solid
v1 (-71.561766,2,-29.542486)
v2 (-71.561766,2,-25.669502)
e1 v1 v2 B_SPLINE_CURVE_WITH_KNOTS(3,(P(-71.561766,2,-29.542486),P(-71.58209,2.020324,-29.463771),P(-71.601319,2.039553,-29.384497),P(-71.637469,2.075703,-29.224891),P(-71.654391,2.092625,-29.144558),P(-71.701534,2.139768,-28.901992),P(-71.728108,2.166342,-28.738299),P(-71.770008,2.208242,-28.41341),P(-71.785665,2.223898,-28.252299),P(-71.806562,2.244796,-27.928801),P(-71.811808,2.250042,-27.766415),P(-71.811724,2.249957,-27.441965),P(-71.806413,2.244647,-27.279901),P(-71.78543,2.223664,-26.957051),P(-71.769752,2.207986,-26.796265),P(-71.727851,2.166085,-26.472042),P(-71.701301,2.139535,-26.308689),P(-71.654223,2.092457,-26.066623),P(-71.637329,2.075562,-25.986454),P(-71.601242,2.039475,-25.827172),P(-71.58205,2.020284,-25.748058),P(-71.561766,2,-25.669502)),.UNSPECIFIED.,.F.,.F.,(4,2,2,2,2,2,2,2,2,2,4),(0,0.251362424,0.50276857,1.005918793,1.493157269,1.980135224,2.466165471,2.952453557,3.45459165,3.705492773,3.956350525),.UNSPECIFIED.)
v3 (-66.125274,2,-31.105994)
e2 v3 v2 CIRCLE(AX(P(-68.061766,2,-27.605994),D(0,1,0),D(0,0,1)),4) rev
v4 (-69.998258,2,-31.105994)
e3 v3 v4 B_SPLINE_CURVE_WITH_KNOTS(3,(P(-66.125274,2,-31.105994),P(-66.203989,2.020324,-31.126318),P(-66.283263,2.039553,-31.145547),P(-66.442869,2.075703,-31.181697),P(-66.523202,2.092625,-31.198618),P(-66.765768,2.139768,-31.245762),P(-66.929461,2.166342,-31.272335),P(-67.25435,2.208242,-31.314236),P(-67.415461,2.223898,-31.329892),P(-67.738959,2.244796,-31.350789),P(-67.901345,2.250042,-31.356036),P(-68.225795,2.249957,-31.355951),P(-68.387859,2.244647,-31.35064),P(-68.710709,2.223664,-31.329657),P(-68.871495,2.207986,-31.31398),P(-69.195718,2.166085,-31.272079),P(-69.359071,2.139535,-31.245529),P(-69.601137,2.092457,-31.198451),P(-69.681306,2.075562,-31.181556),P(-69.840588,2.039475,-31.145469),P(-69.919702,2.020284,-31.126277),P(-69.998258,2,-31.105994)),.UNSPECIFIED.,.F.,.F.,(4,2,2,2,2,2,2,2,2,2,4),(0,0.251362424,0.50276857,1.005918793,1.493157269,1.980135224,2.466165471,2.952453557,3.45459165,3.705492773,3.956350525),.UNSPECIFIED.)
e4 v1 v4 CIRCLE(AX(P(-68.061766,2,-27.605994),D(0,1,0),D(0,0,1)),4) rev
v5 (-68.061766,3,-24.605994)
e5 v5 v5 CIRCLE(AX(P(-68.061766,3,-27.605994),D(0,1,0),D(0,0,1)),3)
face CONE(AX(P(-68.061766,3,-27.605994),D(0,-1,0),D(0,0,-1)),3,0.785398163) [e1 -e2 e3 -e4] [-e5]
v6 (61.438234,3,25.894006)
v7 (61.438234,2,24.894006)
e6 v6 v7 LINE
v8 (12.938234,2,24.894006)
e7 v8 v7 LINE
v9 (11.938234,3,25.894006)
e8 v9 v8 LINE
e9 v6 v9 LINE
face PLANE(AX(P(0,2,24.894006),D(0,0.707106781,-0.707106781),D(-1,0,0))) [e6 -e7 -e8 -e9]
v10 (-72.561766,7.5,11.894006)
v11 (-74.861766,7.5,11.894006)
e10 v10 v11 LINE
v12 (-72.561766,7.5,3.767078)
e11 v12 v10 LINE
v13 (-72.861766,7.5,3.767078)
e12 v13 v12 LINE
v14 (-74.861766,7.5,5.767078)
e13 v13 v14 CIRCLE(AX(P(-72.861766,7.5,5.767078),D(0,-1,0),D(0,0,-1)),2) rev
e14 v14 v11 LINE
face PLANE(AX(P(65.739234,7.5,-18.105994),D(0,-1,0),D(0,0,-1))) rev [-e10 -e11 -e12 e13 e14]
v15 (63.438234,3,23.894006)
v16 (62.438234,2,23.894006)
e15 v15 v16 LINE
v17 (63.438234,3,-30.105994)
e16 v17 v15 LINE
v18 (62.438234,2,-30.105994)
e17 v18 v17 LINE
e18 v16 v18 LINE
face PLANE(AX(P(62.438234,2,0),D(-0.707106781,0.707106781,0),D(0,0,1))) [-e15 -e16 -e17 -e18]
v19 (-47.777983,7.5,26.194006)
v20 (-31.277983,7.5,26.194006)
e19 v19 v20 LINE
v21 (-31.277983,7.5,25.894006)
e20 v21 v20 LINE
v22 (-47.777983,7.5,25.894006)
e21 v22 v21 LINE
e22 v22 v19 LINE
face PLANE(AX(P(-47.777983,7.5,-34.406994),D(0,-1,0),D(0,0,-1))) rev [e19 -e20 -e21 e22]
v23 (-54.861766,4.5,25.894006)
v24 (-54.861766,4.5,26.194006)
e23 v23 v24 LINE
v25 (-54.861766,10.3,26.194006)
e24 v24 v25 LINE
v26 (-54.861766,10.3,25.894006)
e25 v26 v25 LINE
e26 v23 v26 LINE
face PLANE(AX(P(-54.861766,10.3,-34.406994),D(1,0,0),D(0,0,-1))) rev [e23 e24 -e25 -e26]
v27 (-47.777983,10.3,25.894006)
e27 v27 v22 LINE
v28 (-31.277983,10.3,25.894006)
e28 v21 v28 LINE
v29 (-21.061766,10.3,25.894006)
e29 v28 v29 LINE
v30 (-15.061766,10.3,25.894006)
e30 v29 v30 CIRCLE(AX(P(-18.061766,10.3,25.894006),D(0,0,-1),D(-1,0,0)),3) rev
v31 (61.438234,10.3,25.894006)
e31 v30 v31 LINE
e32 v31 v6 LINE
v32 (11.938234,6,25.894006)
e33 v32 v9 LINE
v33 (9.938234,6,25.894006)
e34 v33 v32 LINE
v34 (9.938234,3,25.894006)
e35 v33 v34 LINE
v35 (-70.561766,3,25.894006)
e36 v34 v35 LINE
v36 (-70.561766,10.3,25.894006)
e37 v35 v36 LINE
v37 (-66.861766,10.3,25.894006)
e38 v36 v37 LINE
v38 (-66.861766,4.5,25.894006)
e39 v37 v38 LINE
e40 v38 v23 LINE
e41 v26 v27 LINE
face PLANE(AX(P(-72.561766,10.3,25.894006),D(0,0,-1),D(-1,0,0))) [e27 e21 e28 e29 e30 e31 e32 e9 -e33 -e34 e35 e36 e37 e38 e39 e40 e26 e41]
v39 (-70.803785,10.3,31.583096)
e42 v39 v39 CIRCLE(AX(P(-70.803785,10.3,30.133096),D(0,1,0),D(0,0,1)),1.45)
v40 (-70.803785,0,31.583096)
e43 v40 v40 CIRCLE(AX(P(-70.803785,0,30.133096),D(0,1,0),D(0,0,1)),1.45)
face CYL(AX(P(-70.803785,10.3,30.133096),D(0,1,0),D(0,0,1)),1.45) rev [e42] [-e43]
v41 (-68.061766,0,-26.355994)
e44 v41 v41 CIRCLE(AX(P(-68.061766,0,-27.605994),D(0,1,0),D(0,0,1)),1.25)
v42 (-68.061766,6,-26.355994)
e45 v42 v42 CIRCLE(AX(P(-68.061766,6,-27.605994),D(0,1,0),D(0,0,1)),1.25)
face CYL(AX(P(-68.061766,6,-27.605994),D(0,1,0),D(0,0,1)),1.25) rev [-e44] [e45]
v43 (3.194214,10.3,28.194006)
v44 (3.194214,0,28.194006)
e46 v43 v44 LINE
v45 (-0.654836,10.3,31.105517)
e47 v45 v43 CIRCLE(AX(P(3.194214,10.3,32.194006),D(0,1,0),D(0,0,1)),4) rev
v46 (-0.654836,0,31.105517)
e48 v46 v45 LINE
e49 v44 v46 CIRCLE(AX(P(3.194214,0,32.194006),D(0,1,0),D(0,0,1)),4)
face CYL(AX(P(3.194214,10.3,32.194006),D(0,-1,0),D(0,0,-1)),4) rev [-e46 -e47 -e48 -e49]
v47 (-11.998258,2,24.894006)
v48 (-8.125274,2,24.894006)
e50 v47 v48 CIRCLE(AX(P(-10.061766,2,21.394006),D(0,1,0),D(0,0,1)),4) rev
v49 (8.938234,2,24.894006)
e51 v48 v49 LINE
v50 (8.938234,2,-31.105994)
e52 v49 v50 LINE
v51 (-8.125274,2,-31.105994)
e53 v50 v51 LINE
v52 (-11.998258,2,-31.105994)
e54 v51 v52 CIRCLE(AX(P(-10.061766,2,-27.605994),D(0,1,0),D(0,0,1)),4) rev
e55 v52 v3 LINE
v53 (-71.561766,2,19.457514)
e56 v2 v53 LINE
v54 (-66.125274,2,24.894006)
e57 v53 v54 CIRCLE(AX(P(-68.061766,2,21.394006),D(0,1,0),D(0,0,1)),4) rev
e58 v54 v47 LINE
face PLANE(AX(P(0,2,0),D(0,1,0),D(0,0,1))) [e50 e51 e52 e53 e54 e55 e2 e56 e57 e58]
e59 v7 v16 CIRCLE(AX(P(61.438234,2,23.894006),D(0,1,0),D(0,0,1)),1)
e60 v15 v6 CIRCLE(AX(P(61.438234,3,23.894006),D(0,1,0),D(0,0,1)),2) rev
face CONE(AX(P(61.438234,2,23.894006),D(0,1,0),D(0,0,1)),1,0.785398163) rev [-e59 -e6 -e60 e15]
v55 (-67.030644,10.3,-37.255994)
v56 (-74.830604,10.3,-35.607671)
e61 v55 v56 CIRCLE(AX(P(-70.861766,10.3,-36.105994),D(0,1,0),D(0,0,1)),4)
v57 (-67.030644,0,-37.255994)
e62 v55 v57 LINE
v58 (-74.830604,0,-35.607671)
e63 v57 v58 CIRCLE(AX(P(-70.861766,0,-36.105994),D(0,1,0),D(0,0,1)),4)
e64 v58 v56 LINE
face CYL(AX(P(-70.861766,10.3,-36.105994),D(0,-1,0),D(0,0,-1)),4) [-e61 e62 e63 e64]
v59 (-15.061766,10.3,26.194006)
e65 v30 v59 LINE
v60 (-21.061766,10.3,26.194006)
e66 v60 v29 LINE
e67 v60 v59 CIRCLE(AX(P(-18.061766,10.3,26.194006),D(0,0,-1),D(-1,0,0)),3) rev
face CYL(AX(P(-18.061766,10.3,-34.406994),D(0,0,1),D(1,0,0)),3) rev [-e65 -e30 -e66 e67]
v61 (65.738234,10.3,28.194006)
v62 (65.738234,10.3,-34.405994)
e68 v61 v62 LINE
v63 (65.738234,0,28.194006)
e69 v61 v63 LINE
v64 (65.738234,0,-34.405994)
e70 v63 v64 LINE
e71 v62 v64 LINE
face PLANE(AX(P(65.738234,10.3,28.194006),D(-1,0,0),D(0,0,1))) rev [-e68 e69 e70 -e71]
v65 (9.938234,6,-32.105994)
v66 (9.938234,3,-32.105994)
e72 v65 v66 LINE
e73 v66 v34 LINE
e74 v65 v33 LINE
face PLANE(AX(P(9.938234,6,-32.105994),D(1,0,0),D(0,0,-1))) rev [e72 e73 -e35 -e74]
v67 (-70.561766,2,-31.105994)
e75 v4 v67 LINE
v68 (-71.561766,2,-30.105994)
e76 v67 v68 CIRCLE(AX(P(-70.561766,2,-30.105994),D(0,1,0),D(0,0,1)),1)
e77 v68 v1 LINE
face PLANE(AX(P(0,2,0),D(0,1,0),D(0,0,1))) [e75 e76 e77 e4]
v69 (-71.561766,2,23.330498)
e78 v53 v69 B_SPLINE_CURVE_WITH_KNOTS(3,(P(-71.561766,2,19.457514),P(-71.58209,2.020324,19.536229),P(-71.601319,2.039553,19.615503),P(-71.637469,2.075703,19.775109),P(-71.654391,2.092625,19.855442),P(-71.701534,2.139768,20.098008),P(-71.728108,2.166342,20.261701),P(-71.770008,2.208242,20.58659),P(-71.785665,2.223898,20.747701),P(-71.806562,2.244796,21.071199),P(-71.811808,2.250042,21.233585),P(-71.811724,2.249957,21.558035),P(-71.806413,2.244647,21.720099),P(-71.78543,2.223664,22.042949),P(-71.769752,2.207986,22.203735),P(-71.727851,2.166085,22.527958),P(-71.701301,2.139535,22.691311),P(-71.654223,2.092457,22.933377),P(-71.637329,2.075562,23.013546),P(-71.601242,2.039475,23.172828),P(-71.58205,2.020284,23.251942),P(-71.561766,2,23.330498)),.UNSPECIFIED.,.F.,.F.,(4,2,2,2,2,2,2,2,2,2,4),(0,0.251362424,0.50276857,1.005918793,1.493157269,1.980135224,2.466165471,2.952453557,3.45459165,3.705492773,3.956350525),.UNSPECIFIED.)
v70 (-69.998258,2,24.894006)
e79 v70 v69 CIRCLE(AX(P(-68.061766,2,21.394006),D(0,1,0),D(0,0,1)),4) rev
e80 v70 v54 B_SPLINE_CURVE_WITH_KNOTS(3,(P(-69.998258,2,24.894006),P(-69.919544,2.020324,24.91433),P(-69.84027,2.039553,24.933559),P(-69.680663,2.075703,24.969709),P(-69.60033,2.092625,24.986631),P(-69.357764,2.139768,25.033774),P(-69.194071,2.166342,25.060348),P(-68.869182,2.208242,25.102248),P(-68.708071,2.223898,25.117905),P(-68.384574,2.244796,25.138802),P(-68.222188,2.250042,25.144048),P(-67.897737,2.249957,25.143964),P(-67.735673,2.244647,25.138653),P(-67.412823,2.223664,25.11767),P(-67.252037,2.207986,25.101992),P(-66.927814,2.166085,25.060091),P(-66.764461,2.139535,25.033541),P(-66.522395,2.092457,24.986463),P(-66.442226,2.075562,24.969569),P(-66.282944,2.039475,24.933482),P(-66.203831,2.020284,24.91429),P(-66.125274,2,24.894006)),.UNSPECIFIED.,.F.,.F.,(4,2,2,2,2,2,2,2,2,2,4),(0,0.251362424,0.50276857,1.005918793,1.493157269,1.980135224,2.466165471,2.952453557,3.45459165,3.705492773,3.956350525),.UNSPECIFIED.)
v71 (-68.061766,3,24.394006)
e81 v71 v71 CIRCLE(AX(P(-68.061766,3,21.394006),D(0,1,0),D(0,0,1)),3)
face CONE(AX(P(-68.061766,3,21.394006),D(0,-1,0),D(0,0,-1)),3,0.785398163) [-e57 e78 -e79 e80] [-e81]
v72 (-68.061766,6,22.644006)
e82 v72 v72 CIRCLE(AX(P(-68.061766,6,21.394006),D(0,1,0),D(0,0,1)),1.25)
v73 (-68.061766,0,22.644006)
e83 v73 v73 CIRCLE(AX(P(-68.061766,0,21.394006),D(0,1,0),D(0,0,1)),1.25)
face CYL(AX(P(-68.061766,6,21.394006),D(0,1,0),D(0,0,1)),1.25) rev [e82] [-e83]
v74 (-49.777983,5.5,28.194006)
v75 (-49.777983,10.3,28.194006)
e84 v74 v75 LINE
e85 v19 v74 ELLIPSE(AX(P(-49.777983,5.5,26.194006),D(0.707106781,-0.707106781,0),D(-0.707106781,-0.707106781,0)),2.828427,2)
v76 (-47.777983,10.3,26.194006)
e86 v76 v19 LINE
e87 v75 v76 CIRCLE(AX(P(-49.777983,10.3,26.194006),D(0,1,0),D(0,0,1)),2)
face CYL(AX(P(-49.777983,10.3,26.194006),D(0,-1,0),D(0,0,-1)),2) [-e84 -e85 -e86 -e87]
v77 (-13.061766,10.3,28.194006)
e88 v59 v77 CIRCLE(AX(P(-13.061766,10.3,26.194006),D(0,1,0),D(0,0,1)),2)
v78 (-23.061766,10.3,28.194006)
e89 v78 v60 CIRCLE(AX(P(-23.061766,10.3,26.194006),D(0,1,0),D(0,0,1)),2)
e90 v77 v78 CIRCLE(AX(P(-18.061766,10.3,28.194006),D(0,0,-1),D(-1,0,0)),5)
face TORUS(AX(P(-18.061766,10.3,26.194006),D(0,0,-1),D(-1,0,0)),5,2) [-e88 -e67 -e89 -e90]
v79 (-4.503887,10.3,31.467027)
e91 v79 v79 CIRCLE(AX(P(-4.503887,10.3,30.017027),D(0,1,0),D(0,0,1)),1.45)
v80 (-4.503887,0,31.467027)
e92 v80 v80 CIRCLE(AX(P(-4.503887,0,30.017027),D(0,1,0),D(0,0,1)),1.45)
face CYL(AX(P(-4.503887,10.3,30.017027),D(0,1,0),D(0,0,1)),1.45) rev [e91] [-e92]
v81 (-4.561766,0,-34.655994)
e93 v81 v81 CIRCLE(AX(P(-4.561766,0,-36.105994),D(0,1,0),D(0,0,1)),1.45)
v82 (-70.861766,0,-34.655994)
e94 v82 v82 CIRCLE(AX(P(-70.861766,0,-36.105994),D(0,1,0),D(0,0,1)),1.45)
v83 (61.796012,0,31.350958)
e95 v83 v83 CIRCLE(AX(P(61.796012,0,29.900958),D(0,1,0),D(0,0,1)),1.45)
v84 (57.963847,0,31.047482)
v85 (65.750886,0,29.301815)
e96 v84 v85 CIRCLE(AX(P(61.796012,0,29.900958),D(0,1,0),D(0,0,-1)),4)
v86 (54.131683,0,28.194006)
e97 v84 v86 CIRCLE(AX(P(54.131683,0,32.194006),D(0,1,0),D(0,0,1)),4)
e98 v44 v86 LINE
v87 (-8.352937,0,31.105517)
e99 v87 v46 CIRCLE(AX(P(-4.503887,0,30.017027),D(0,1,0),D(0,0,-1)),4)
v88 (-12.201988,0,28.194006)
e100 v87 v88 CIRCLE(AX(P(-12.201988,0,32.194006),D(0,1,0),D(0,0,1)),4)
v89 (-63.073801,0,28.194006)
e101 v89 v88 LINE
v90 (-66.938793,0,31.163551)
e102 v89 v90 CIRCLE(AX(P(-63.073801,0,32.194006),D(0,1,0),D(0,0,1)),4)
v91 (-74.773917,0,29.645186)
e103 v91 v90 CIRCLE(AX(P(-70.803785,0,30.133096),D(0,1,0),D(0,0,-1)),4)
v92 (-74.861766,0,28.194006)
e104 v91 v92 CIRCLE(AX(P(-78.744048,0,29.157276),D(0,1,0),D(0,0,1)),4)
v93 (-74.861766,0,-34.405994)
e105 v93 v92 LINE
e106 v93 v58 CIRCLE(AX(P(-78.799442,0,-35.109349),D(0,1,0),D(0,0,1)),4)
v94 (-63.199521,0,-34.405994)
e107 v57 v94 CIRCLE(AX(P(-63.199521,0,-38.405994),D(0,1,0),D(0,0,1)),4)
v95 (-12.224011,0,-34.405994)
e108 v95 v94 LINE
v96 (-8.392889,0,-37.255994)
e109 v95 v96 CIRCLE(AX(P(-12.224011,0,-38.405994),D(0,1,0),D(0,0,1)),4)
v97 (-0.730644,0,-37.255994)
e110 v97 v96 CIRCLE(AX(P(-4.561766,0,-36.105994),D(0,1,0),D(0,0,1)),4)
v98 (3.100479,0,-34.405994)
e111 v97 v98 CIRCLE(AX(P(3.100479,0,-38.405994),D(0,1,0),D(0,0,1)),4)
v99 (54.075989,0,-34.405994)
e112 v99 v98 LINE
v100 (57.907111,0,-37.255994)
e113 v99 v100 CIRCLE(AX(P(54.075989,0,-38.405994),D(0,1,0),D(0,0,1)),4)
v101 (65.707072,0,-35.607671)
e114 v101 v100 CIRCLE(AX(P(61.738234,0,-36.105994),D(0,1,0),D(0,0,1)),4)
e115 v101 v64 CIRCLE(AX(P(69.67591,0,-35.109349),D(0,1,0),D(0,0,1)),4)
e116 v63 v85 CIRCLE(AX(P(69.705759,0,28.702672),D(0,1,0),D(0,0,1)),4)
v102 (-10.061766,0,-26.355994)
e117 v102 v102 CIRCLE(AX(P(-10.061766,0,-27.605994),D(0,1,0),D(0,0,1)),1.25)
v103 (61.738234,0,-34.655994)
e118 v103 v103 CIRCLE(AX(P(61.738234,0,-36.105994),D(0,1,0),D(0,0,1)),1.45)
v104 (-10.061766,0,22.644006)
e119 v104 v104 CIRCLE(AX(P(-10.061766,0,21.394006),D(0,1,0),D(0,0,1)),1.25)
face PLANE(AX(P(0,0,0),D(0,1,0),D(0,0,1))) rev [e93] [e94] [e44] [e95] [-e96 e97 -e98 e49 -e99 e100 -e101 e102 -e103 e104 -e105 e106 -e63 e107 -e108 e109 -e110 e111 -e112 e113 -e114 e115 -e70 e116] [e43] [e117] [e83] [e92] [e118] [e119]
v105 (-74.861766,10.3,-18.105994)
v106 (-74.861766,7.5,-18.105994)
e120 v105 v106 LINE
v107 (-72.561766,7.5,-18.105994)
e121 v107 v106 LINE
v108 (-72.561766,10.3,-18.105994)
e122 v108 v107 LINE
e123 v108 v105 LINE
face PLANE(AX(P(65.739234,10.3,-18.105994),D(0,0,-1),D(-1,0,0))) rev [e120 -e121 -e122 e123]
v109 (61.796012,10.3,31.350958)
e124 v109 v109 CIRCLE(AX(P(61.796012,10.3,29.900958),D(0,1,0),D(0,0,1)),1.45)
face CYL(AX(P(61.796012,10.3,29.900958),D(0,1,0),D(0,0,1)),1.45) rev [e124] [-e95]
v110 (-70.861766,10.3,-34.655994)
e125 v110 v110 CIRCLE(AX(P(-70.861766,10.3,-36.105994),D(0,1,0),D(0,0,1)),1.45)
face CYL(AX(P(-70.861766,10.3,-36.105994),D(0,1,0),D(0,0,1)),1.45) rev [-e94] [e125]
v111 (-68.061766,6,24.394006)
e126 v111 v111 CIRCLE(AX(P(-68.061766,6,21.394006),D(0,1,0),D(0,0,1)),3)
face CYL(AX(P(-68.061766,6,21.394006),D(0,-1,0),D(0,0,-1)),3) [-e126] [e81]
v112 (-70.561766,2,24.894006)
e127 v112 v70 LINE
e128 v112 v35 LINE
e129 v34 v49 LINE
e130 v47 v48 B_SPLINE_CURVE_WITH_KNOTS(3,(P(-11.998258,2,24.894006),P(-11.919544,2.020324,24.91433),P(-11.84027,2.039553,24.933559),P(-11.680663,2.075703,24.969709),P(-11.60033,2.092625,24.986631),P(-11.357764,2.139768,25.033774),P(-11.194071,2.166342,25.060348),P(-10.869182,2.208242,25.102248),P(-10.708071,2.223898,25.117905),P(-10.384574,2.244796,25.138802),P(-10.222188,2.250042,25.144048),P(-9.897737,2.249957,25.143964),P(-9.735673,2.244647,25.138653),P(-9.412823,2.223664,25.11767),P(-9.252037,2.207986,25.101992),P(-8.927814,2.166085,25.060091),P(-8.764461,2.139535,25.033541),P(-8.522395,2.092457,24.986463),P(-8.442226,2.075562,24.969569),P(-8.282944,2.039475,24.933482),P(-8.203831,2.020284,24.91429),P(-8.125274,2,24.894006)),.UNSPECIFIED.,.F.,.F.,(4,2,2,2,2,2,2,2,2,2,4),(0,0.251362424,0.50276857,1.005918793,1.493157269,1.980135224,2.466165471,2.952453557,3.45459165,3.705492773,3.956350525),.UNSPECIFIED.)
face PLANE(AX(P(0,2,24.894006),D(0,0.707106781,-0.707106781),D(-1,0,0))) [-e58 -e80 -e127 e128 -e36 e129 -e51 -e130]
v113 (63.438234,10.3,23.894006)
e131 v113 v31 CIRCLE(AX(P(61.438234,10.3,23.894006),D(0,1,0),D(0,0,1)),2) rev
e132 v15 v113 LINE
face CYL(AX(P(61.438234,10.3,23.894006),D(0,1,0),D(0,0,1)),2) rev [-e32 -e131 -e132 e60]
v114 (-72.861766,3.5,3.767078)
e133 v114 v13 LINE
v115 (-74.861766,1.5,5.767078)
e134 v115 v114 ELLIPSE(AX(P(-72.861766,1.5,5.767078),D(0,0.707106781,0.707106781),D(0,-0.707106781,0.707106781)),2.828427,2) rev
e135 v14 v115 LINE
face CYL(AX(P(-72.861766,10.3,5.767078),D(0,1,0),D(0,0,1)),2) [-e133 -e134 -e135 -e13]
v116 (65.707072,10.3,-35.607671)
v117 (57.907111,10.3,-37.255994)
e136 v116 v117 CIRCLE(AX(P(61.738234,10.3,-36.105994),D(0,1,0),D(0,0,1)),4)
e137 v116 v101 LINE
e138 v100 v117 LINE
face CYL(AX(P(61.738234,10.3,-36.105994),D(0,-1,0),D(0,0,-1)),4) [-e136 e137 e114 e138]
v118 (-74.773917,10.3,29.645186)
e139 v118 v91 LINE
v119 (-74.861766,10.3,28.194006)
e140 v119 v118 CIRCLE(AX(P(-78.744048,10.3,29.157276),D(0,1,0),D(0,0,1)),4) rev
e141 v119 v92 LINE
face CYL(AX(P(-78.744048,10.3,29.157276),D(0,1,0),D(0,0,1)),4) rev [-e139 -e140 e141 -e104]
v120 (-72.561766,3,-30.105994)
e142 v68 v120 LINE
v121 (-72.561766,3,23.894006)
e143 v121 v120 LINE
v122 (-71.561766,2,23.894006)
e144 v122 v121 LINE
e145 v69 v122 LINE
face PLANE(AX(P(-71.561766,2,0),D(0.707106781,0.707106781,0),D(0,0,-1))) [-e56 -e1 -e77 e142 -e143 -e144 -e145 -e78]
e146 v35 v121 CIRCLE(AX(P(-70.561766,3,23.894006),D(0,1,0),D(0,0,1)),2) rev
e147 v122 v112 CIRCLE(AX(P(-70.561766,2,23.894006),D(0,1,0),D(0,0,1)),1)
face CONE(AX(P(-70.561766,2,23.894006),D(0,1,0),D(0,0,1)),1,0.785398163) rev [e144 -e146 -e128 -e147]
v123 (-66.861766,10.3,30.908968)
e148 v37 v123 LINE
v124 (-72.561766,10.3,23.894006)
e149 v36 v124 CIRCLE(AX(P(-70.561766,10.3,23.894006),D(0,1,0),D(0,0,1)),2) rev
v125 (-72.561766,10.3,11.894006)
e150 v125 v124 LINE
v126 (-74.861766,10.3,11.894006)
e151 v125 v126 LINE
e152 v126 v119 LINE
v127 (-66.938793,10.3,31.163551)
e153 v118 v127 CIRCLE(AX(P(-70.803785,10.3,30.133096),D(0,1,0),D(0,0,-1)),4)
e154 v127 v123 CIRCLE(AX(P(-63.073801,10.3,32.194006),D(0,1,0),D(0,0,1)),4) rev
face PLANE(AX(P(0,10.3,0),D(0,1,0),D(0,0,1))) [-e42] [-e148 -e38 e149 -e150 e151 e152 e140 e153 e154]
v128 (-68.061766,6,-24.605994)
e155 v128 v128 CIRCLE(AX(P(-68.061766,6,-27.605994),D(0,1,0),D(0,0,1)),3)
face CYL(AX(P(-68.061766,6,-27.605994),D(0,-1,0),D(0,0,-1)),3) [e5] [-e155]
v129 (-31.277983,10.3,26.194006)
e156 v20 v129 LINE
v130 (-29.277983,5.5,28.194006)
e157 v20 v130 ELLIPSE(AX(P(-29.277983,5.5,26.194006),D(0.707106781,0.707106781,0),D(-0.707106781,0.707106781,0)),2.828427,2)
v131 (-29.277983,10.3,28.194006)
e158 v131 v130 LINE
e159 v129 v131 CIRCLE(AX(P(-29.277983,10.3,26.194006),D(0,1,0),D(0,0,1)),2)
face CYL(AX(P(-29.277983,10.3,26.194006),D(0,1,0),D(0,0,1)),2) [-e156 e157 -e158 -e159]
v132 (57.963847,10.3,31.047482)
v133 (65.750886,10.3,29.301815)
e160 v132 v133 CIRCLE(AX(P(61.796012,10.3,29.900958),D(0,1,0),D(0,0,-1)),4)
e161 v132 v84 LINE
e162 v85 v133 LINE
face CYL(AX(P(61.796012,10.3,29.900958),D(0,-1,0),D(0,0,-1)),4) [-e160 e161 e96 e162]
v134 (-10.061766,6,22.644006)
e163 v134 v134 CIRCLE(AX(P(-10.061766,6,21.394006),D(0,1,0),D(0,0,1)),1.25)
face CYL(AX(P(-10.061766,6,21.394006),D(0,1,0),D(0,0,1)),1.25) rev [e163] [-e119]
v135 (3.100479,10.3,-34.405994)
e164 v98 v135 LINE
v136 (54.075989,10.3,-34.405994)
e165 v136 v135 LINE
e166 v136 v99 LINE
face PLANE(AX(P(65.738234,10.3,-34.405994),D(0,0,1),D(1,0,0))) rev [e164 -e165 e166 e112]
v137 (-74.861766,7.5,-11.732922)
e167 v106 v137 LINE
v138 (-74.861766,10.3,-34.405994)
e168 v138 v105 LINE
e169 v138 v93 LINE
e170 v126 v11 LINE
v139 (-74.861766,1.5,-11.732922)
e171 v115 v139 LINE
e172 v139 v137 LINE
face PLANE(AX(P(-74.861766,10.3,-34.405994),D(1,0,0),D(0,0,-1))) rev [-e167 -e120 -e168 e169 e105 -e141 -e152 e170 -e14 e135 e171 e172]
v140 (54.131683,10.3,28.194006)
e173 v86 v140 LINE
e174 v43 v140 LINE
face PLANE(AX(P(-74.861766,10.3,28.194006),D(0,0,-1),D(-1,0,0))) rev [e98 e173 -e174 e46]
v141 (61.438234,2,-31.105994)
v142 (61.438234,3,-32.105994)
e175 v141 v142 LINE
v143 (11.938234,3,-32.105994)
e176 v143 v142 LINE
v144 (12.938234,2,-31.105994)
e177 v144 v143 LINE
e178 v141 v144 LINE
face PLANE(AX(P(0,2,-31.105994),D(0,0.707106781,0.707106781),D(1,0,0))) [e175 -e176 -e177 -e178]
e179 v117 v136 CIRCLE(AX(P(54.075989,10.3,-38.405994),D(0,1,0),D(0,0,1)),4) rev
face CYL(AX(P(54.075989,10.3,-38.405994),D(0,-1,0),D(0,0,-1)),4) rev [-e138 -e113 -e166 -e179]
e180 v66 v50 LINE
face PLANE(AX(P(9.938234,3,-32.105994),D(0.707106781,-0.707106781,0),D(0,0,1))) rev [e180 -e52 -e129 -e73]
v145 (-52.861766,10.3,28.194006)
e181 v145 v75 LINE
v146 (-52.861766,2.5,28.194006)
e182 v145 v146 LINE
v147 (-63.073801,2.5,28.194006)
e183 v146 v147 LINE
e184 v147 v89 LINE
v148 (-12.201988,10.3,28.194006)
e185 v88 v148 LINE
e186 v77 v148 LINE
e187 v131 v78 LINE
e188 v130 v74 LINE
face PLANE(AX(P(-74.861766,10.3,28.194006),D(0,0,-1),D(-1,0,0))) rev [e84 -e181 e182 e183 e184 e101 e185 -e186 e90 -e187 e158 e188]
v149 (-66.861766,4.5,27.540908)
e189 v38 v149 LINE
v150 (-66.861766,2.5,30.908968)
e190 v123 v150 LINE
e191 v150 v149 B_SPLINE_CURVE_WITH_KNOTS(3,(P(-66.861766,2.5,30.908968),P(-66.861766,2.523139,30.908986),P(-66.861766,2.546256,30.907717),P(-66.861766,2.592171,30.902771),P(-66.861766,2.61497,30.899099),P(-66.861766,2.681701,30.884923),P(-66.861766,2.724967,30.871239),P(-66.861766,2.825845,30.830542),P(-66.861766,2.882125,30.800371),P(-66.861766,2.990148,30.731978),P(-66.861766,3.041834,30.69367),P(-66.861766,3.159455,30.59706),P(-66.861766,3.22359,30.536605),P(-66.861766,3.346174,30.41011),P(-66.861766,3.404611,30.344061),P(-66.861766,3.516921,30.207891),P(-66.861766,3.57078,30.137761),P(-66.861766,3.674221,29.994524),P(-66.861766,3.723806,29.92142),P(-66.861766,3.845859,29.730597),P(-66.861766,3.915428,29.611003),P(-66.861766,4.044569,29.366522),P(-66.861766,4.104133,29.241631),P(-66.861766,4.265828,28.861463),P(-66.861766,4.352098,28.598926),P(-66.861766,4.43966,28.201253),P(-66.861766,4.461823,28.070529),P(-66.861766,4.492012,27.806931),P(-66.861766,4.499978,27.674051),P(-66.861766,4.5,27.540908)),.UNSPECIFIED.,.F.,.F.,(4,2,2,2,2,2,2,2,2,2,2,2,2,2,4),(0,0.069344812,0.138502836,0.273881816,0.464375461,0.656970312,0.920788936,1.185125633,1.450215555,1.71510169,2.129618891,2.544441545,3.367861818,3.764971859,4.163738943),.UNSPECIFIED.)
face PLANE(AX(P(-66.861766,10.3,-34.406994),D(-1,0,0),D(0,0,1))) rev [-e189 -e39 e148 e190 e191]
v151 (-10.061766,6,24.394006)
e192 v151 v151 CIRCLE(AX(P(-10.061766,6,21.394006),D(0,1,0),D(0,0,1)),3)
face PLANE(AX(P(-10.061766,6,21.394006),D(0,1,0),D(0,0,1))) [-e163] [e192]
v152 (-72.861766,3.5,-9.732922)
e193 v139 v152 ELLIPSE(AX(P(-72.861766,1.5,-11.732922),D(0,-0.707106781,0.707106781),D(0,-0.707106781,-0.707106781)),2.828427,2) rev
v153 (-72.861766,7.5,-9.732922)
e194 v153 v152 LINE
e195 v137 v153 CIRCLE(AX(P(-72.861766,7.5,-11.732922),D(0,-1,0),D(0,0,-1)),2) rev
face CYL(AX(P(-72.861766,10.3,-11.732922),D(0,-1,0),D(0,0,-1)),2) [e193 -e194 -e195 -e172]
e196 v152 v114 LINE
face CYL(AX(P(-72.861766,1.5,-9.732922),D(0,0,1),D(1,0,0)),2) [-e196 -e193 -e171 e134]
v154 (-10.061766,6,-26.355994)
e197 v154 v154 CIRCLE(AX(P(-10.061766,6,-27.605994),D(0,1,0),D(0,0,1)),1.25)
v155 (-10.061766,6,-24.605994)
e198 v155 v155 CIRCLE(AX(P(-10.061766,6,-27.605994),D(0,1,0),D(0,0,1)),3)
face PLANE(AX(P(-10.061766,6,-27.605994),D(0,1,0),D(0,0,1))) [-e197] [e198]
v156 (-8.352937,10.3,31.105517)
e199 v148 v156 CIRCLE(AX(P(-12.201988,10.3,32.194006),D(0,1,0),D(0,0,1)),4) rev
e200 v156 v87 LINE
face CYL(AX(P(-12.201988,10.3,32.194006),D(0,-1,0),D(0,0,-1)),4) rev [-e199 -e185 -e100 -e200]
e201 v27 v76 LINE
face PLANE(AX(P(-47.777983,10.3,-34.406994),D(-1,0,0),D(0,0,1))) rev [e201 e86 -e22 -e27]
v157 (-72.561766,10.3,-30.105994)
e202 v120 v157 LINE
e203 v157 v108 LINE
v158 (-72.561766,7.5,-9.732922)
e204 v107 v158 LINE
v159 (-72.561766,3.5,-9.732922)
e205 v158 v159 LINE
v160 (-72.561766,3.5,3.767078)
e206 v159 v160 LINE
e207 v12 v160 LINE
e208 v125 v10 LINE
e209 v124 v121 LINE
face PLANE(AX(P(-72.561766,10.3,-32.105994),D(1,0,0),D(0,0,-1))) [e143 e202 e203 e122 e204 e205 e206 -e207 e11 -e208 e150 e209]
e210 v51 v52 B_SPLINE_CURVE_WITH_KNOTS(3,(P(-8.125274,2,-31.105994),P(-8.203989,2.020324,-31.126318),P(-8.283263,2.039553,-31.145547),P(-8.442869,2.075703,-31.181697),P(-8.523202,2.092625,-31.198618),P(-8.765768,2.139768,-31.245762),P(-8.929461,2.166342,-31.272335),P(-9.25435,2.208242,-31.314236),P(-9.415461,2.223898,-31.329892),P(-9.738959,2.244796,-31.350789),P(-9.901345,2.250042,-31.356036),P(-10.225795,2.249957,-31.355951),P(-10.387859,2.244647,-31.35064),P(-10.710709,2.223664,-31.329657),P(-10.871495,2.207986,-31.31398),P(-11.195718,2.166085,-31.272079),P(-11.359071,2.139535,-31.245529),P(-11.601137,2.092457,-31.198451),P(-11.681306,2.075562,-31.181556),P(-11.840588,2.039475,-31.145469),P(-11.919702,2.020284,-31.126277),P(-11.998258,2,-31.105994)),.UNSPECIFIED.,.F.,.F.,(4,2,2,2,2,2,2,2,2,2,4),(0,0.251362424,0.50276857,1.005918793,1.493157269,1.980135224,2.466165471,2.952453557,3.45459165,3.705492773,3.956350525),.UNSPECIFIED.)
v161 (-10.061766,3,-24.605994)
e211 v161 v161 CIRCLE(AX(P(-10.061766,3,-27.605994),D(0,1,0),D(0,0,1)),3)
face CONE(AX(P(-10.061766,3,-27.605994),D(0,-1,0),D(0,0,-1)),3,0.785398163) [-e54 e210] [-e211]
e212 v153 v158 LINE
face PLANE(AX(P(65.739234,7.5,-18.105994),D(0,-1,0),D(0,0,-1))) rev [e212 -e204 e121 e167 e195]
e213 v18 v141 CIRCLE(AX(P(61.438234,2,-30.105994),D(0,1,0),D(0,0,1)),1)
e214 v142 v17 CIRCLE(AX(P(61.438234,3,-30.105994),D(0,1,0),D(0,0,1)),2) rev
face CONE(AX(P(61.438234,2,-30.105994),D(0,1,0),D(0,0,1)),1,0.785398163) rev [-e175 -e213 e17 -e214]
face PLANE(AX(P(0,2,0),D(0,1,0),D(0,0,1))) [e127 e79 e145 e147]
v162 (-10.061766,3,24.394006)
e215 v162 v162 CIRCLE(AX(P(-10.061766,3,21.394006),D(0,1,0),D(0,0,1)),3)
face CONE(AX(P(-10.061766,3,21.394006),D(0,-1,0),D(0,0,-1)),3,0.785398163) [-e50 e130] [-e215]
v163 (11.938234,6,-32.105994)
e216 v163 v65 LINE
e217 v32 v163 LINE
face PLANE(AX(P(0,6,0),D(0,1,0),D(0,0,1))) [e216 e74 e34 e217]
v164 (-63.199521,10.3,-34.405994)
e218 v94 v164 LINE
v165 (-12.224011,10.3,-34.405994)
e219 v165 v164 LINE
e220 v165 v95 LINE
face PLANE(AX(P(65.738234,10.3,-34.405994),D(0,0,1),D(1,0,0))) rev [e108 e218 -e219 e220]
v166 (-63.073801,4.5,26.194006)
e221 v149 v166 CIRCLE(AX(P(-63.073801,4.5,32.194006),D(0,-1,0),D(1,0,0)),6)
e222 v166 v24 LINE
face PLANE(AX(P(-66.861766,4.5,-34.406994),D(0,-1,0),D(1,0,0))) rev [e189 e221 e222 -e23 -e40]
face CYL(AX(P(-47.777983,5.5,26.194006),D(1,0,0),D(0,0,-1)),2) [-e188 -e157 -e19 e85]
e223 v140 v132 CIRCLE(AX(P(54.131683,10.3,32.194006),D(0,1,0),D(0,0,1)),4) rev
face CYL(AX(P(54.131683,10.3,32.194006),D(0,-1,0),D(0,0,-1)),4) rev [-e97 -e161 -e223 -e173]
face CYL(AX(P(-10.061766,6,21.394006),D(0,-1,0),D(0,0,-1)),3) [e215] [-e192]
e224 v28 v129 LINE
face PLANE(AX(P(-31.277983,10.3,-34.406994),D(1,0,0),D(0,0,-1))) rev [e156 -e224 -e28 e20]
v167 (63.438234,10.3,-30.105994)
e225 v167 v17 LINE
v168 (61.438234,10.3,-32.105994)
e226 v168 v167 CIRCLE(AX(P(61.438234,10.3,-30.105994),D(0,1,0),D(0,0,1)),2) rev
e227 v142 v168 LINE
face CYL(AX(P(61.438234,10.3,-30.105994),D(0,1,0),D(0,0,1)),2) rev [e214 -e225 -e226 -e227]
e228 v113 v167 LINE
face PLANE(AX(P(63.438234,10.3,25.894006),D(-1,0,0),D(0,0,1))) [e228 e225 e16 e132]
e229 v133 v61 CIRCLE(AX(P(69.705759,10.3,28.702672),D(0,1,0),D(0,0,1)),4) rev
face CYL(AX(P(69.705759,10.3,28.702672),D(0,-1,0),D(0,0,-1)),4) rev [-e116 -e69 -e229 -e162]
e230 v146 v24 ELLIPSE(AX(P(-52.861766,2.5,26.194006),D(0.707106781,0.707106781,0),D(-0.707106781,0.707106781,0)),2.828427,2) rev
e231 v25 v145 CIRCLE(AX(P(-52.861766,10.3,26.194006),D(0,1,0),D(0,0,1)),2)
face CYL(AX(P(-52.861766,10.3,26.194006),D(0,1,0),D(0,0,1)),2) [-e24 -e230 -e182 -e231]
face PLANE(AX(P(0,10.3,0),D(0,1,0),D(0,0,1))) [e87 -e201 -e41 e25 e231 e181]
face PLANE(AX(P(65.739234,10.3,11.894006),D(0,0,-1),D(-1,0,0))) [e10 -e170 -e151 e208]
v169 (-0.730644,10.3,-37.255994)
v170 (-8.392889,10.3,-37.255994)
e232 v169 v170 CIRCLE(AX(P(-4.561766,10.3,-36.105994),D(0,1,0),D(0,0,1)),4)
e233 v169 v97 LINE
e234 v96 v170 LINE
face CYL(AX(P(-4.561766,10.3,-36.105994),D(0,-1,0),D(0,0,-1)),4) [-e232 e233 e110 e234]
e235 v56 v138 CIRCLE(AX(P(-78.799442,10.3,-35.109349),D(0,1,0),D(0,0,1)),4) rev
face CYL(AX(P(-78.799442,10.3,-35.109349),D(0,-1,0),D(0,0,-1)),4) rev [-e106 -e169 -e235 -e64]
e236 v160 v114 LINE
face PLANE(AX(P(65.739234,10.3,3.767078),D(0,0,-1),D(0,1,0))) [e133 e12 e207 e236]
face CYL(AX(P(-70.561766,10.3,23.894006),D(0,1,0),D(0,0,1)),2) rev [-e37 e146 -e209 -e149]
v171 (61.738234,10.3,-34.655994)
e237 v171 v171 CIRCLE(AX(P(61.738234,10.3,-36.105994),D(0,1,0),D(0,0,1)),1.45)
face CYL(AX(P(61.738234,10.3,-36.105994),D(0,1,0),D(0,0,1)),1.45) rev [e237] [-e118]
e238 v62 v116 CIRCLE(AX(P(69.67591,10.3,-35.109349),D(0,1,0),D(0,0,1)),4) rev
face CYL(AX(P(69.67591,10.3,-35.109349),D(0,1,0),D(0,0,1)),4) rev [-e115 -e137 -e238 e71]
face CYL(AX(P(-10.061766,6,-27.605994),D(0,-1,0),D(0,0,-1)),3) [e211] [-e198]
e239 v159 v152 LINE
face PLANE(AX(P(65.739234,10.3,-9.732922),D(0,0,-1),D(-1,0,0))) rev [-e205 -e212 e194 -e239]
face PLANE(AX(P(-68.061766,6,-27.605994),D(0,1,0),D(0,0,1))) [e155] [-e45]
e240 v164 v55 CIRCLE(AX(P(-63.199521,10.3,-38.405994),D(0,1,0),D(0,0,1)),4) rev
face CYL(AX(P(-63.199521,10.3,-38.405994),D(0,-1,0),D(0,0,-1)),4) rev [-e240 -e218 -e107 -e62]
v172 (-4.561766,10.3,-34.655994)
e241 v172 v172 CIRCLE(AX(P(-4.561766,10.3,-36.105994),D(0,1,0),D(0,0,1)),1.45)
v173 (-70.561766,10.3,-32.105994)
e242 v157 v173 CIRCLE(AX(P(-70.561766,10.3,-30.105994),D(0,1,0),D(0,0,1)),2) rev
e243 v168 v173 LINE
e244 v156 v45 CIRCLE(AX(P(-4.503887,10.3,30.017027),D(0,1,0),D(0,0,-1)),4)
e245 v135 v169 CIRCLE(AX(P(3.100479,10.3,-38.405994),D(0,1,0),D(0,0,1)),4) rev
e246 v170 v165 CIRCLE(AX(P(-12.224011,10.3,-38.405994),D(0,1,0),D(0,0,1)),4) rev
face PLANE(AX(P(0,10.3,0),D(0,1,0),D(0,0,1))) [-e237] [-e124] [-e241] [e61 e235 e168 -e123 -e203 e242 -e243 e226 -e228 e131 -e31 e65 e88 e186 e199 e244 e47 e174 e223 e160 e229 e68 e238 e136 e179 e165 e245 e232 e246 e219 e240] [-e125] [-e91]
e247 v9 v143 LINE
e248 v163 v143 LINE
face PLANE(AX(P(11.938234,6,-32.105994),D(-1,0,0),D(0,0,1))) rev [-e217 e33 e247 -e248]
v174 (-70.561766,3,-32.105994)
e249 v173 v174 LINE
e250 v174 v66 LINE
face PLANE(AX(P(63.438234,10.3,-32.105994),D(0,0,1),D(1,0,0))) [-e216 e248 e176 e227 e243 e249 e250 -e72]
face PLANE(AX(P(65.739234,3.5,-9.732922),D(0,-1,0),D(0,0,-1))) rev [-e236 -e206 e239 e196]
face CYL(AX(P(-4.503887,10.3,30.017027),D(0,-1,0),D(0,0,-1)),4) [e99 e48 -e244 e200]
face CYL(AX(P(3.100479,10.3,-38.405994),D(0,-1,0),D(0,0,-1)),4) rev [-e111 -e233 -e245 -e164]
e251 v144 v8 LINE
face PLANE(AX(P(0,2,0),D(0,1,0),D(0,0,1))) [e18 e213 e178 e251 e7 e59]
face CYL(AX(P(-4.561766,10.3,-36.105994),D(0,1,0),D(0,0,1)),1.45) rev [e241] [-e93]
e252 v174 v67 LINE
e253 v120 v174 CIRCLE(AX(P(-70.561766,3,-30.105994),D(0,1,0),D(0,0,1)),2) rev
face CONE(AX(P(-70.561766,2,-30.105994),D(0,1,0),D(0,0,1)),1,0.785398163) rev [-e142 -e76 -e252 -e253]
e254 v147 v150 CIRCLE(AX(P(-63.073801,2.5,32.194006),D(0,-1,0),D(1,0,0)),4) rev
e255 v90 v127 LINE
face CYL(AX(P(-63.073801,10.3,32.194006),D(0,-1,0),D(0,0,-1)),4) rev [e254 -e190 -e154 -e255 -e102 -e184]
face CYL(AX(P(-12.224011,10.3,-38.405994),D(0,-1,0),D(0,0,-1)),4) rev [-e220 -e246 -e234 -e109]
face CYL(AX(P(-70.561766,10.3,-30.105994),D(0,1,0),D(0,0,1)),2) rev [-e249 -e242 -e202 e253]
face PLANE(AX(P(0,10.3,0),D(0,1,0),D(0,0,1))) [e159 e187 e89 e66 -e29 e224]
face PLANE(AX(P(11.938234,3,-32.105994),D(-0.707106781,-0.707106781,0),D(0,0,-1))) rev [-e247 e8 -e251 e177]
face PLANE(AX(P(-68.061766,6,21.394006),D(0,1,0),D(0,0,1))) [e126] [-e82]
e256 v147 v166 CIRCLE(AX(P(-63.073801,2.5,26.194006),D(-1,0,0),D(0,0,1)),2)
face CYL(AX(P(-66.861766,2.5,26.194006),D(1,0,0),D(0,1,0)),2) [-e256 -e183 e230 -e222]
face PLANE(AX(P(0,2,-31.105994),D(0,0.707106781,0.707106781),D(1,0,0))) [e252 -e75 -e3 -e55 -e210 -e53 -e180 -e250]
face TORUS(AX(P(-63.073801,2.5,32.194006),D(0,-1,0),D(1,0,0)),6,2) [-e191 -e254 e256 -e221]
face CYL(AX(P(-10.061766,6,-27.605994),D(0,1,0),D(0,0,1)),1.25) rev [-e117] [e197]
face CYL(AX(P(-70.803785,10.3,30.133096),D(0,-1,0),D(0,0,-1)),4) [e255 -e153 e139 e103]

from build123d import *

# Parameters (mm, degrees)
SKETCH3_W                      = 140.6
SKETCH3_H                      = 62.6
SKETCH3_W_2                    = 136
SKETCH3_H_2                    = 58
BOSS_EXTRUDE1_DEPTH            = 10.3
SKETCH5_W                      = 136
SKETCH5_H                      = 58
BOSS_EXTRUDE2_DEPTH            = 2
SKETCH6_R                      = 3
BOSS_EXTRUDE3_DEPTH            = 4
F_2_5_2_5_DIAMETER_HOLE1_D     = 2.5
F_2_5_2_5_DIAMETER_HOLE1_DEPTH = 8
F_2_5_2_5_DIAMETER_HOLE1_TIP   = 0.751075774
SKETCH10_W                     = 2
SKETCH10_H                     = 58
BOSS_EXTRUDE4_DEPTH            = 4
CUT_EXTRUDE1_REACH             = 100.128
SKETCH11_R                     = 3
SKETCH11_W                     = 12
SKETCH11_H                     = 5.8
SKETCH11_W_2                   = 16.5
SKETCH11_H_2                   = 2.8
CUT_EXTRUDE2_REACH             = 147.115
SKETCH12_W                     = 13.5
SKETCH12_H                     = 6.8
SKETCH12_W_2                   = 30
SKETCH12_H_2                   = 2.8
SKETCH13_R                     = 4
BOSS_EXTRUDE5_DEPTH            = 10.3
FILLET2_R                      = 4
FILLET3_R                      = 4
FILLET4_R                      = 4
F_2_9_2_9_DIAMETER_HOLE1_D     = 2.9
FILLET6_R                      = 2
FILLET7_R                      = 2
FILLET8_R                      = 2
CHAMFER1_SIZE                  = 1
CHAMFER2_SIZE                  = 1
FILLET9_R                      = 2


with BuildPart() as part:
    # Sketch3 → Boss-Extrude1 (new body)
    with BuildSketch(Plane(origin=(0, 0, 0), x_dir=(1, 0, 0), z_dir=(0, 1, 0))):
        with Locations((-4.561766162, 3.105993834)):
            Rectangle(SKETCH3_W, SKETCH3_H)
        with Locations((-4.561766162, 3.105993834)):
            Rectangle(SKETCH3_W_2, SKETCH3_H_2, mode=Mode.SUBTRACT)
    extrude(amount=BOSS_EXTRUDE1_DEPTH)

    # Sketch5 → Boss-Extrude2 (add)
    with BuildSketch(Plane(origin=(0, 0, 0), x_dir=(1, 0, 0), z_dir=(0, 1, 0))):
        with Locations((-4.561766162, 3.105993834)):
            Rectangle(SKETCH5_W, SKETCH5_H)
    extrude(amount=BOSS_EXTRUDE2_DEPTH)

    # Sketch6 → Boss-Extrude3 (add)
    with BuildSketch(Plane(origin=(0, 2, 0), x_dir=(1, 0, 0), z_dir=(0, 1, 0))):
        with Locations(Location((-68.061766162, 27.605993834, 0), (0, 0, 270))):
            Circle(SKETCH6_R)
        with Locations(Location((-68.061766162, -21.394006166, 0), (0, 0, 270))):
            Circle(SKETCH6_R)
        with Locations(Location((-10.061766162, -21.394006166, 0), (0, 0, 270))):
            Circle(SKETCH6_R)
        with Locations(Location((-10.061766162, 27.605993834, 0), (0, 0, 270))):
            Circle(SKETCH6_R)
    extrude(amount=BOSS_EXTRUDE3_DEPTH)

    # Ø2.5 (2.5) Diameter Hole1
    with Locations(Plane(origin=(0, 6, 0), x_dir=(1, 0, 0), z_dir=(0, 1, 0))):
        with Locations((-68.061766162, 27.605993834), (-10.061766162, 27.605993834), (-10.061766162, -21.394006166), (-68.061766162, -21.394006166)):
            Hole(F_2_5_2_5_DIAMETER_HOLE1_D / 2, depth=F_2_5_2_5_DIAMETER_HOLE1_DEPTH)
            with Locations((0, 0, -(F_2_5_2_5_DIAMETER_HOLE1_DEPTH + F_2_5_2_5_DIAMETER_HOLE1_TIP / 2))):  # 118° drill point
                Cone(0, F_2_5_2_5_DIAMETER_HOLE1_D / 2, F_2_5_2_5_DIAMETER_HOLE1_TIP, mode=Mode.SUBTRACT)

    # Sketch10 → Boss-Extrude4 (add)
    with BuildSketch(Plane(origin=(0, 2, 0), x_dir=(1, 0, 0), z_dir=(0, 1, 0))):
        with Locations((10.938233838, 3.105993834)):
            Rectangle(SKETCH10_W, SKETCH10_H)
    extrude(amount=BOSS_EXTRUDE4_DEPTH)

    # Sketch11 → Cut-Extrude1 (cut, up to next)
    with BuildSketch(Plane.XY.offset(28.194006166), mode=Mode.PRIVATE) as cut_extrude1_sk1:
        with Locations((-18.061766162, 10.3)):
            Circle(SKETCH11_R)
    cut_extrude1_tool1 = extrude(cut_extrude1_sk1.sketch, amount=-CUT_EXTRUDE1_REACH, mode=Mode.PRIVATE) & part.part
    # Sketch11 → Cut-Extrude1 (cut, up to next)
    with BuildSketch(Plane.XY.offset(28.194006166), mode=Mode.PRIVATE) as cut_extrude1_sk2:
        with Locations((-60.861766162, 7.4)):
            Rectangle(SKETCH11_W, SKETCH11_H)
    cut_extrude1_tool2 = extrude(cut_extrude1_sk2.sketch, amount=-CUT_EXTRUDE1_REACH, mode=Mode.PRIVATE) & part.part
    # Sketch11 → Cut-Extrude1 (cut, up to next)
    with BuildSketch(Plane.XY.offset(28.194006166), mode=Mode.PRIVATE) as cut_extrude1_sk3:
        with Locations((-39.527982648, 8.9)):
            Rectangle(SKETCH11_W_2, SKETCH11_H_2)
    cut_extrude1_tool3 = extrude(cut_extrude1_sk3.sketch, amount=-CUT_EXTRUDE1_REACH, mode=Mode.PRIVATE) & part.part
    add(cut_extrude1_tool1.solids().sort_by_distance((-18.061766, 10.3, 28.194006))[0], mode=Mode.SUBTRACT)
    add(cut_extrude1_tool2.solids().sort_by_distance((-60.861766, 7.4, 28.194006))[0], mode=Mode.SUBTRACT)
    add(cut_extrude1_tool3.solids().sort_by_distance((-39.527983, 8.9, 28.194006))[0], mode=Mode.SUBTRACT)

    # Sketch12 → Cut-Extrude2 (cut, up to next)
    with BuildSketch(Plane.ZY.offset(74.861766162), mode=Mode.PRIVATE) as cut_extrude2_sk1:
        with Locations((-2.982922372, 6.9)):
            Rectangle(SKETCH12_W, SKETCH12_H)
    cut_extrude2_tool1 = extrude(cut_extrude2_sk1.sketch, amount=-CUT_EXTRUDE2_REACH, mode=Mode.PRIVATE) & part.part
    # Sketch12 → Cut-Extrude2 (cut, up to next)
    with BuildSketch(Plane.ZY.offset(74.861766162), mode=Mode.PRIVATE) as cut_extrude2_sk2:
        with Locations((-3.105993834, 8.9)):
            Rectangle(SKETCH12_W_2, SKETCH12_H_2)
    cut_extrude2_tool2 = extrude(cut_extrude2_sk2.sketch, amount=-CUT_EXTRUDE2_REACH, mode=Mode.PRIVATE) & part.part
    add(cut_extrude2_tool1.solids().sort_by_distance((-74.861766, 6.9, -2.982922))[0], mode=Mode.SUBTRACT)
    add(cut_extrude2_tool2.solids().sort_by_distance((-74.861766, 8.9, -3.105994))[0], mode=Mode.SUBTRACT)

    # Sketch13 → Boss-Extrude5 (add)
    with BuildSketch(Plane(origin=(0, 0, 0), x_dir=(1, 0, 0), z_dir=(0, 1, 0))):
        with Locations((-70.861766162, 36.105993834)):
            Circle(SKETCH13_R)
        with Locations((-4.561766162, 36.105993834)):
            Circle(SKETCH13_R)
        with Locations((61.738233838, 36.105993834)):
            Circle(SKETCH13_R)
        with Locations((61.796011733, -29.900958235)):
            Circle(SKETCH13_R)
        with Locations((-4.503886668, -30.017026964)):
            Circle(SKETCH13_R)
        with Locations((-70.80378507, -30.133095693)):
            Circle(SKETCH13_R)
    extrude(amount=BOSS_EXTRUDE5_DEPTH)

    # Fillet2
    # the kernel refuses this fillet: 4 mm, written as the material it adds along each edge
    with BuildSketch(Plane(origin=(-74.48253956, 10.3, -34.405993834), x_dir=(-1, 0, 0), z_dir=(0, -1, 0))) as fillet2_piece_1:
        with BuildLine():
            CenterArc((4.316902517, 0.703355094), FILLET2_R, 172.843462622, 17.284010607)
            Line((0.348064559, 1.201677547), (0.2686878, 1.211643996))
            ThreePointArc((0.2686878, 1.211643996), (0.144462277, 0.609403692), (-0.072415468, 0.034))
            Line((-0.072415468, 0.034), (0, -0.08))
            ThreePointArc((0, -0.08), (0.189613301, -0.08), (0.300473084, -0.014067102))
            Line((0.300473084, -0.014067102), (0.379226602, 0))
        make_face()
    extrude(amount=10.3)

    # Fillet3
    fillet3_edges = [part.edges().sort_by_distance(p)[0] for p in [
        (58.178510574, 5.15, 28.194006166),
        (-67.305223679, 5.15, 28.194006166),
        (-0.943466023, 5.15, 28.194006166),
        (-8.064307313, 5.15, 28.194006166),
        (58.11746044, 5.15, -34.405993834),
        (-8.18253956, 5.15, -34.405993834),
        (-0.940992764, 5.15, -34.405993834),
        (-67.240992764, 5.15, -34.405993834),
    ]]
    fillet(fillet3_edges, radius=FILLET3_R)

    # Fillet4
    # the kernel refuses this fillet: 4 mm, written as the material it adds along each edge
    with BuildSketch(Plane(origin=(-74.30234646, 10.3, 28.194006166), x_dir=(-0.3090485748086473, 0, 0.9510462546105442), z_dir=(0, -1, 0))) as fillet4_piece_1:
        with BuildLine():
            CenterArc((2.288815263, 3.926566562), FILLET4_R, 238.063311662, 20.941030322)
            Line((0.172887862, 0.532034012), (0, 0))
            ThreePointArc((0, 0), (0.762938421, 0.073433438), (1.525876842, 0))
        make_face()
    extrude(amount=10.3)
    with BuildSketch(Plane(origin=(65.413512892, 10.3, 28.194006166), x_dir=(0.29133036394129125, 0, 0.9566225060314203), z_dir=(0, -1, 0))) as fillet4_piece_2:
        with BuildLine():
            CenterArc((1.73706251, -3.957869992), FILLET4_R, 98.323104154, 15.92039244)
            Line((0.094601071, -0.310635365), (0, 0))
            ThreePointArc((0, 0), (0.579020837, -0.042130008), (1.158041673, 0))
        make_face()
    extrude(amount=10.3)
    with BuildSketch(Plane(origin=(65.359007236, 10.3, -34.405993834), x_dir=(1, 0, 0), z_dir=(0, -1, 0))) as fillet4_piece_3:
        with BuildLine():
            CenterArc((4.316902517, -0.703355094), FILLET4_R, 169.87252677, 17.284010607)
            ThreePointArc((0.348064559, -1.201677547), (0.221303822, -0.587146624), (0, 0))
            Line((0, 0), (0.379226602, 0))
        make_face()
    extrude(amount=10.3)

    # Ø2.9 (2.9) Diameter Hole1 (through all)
    with Locations(Plane(origin=(0, 10.3, 0), x_dir=(1, 0, 0), z_dir=(0, 1, 0))):
        with Locations((-70.861766162, 36.105993834), (-4.561766162, 36.105993834), (61.738233838, 36.105993834), (61.796011733, -29.900958235), (-4.503886668, -30.017026964), (-70.80378507, -30.133095693)):
            Hole(F_2_9_2_9_DIAMETER_HOLE1_D / 2)

    # Fillet6
    fillet6_edges = [part.edges().sort_by_distance(p)[0] for p in [
        (63.438233838, 6.15, -32.105993834),
    ]]
    fillet(fillet6_edges, radius=FILLET6_R)

    # Fillet7
    fillet7_edges = [part.edges().sort_by_distance(p)[0] for p in [
        (63.438233838, 6.15, 25.894006166),
    ]]
    fillet(fillet7_edges, radius=FILLET7_R)

    # Fillet8
    fillet8_edges = [part.edges().sort_by_distance(p)[0] for p in [
        (-72.561766162, 6.15, -32.105993834),
        (-72.561766162, 6.15, 25.894006166),
    ]]
    fillet(fillet8_edges, radius=FILLET8_R)

    # Chamfer1
    chamfer1_edges = [part.edges().sort_by_distance(p)[0] for p in [
        (-68.061766162, 2, -30.605993834),
        (-68.061766162, 2, 18.394006166),
        (-10.061766162, 2, 18.394006166),
        (-10.061766162, 2, -30.605993834),
    ]]
    chamfer(chamfer1_edges, length=CHAMFER1_SIZE)

    # Chamfer2
    # the kernel refuses this chamfer: 1 mm, written as the material it adds along each edge
    with BuildSketch(Plane(origin=(9.36655085, 2, -32.105993834), x_dir=(0, 0.9996219169112968, -0.027495876610589075), z_dir=(1, 0, 0)), Plane(origin=(61.438233838, 2, 25.894006166), x_dir=(0, 0.9996219169112968, 0.027495876610585623), z_dir=(-1, 0, 0))) as chamfer2_piece_1:
        Polygon((CHAMFER2_SIZE * 0.999621916911, CHAMFER2_SIZE * 0.0274958766106), (-CHAMFER2_SIZE * 0.0274958766106, CHAMFER2_SIZE * 0.999621916911), (0, 0), align=None)
    extrude(amount=52.071682988)
    with BuildSketch(Plane(origin=(61.438233838, 2, -30.105993834), x_dir=(1, 0, 0), z_dir=(0, 0, 1))) as chamfer2_piece_2:
        Polygon((2 - CHAMFER2_SIZE, 0), (2, CHAMFER2_SIZE), (2, 0), align=None)
    revolve(axis=Axis((61.438233838, 2, -30.105993834), (0, 1, 0)), revolution_arc=90)
    with BuildSketch(Plane(origin=(63.438233838, 2, -30.105993834), x_dir=(-0.9996219169112968, -0.02749587661058639, 0), z_dir=(0, 0, 1)), Plane(origin=(-72.561766162, 2, 23.894006166), x_dir=(0.9996219169112968, -0.027495876610586605, 0), z_dir=(0, 0, -1))) as chamfer2_piece_3:
        Polygon((CHAMFER2_SIZE * 0.999621916911, -CHAMFER2_SIZE * 0.0274958766106), (-CHAMFER2_SIZE * 0.0274958766106, -CHAMFER2_SIZE * 0.999621916911), (0, 0), align=None)
    extrude(amount=54)
    with BuildSketch(Plane(origin=(61.438233838, 2, 23.894006166), x_dir=(1, 0, 0), z_dir=(0, 0, -1))) as chamfer2_piece_4:
        Polygon((2 - CHAMFER2_SIZE, 0), (2, -CHAMFER2_SIZE), (2, 0), align=None)
    revolve(axis=Axis((61.438233838, 2, 23.894006166), (0, -1, 0)), revolution_arc=90)
    with BuildSketch(Plane(origin=(12.509916826, 2, 25.894006166), x_dir=(0, -0.027495876610586296, -0.9996219169112968), z_dir=(-1, 0, 0)), Plane(origin=(-70.561766162, 2, -32.105993834), x_dir=(0, -0.027495876610586296, 0.9996219169112968), z_dir=(1, 0, 0))) as chamfer2_piece_5:
        Polygon((CHAMFER2_SIZE * 0.999621916911, -CHAMFER2_SIZE * 0.0274958766106), (-CHAMFER2_SIZE * 0.0274958766106, -CHAMFER2_SIZE * 0.999621916911), (0, 0), align=None)
    extrude(amount=83.071682988)
    with BuildSketch(Plane(origin=(-70.561766162, 2, -30.105993834), x_dir=(0, 0, -1), z_dir=(1, 0, 0))) as chamfer2_piece_6:
        Polygon((2 - CHAMFER2_SIZE, 0), (2, CHAMFER2_SIZE), (2, 0), align=None)
    revolve(axis=Axis((-70.561766162, 2, -30.105993834), (0, 1, 0)), revolution_arc=90)
    with BuildSketch(Plane(origin=(-70.561766162, 2, 23.894006166), x_dir=(0, 0, 1), z_dir=(1, 0, 0))) as chamfer2_piece_7:
        Polygon((2 - CHAMFER2_SIZE, 0), (2, -CHAMFER2_SIZE), (2, 0), align=None)
    revolve(axis=Axis((-70.561766162, 2, 23.894006166), (0, -1, 0)), revolution_arc=90)
    with BuildSketch(Plane(origin=(9.938233838, 2, 28.465689154), x_dir=(-0.9996219169112968, -0.027495876610586296, 0), z_dir=(0, 0, -1))) as chamfer2_piece_8_section:
        Polygon((CHAMFER2_SIZE * 0.999621916911, CHAMFER2_SIZE * 0.0274958766106), (-CHAMFER2_SIZE * 0.0274958766106, CHAMFER2_SIZE * 0.999621916911), (0, 0), align=None)
    chamfer2_piece_8 = extrude(amount=63.143365976, mode=Mode.PRIVATE)
    chamfer2_piece_8 = split(chamfer2_piece_8, bisect_by=Plane(origin=(9.604900504, 2.333333333, 28.194006166), z_dir=(0, 0, -1)), keep=Keep.TOP, mode=Mode.PRIVATE)
    chamfer2_piece_8 = split(chamfer2_piece_8, bisect_by=Plane(origin=(9.604900504, 2.333333333, -34.405993834), z_dir=(0, 0, 1)), keep=Keep.TOP, mode=Mode.PRIVATE)
    add(chamfer2_piece_8)
    with BuildSketch(Plane(origin=(11.938233838, 2, -34.677676822), x_dir=(-0.027495876610585623, 0.9996219169112968, 0), z_dir=(0, 0, 1))) as chamfer2_piece_9_section:
        Polygon((CHAMFER2_SIZE * 0.999621916911, -CHAMFER2_SIZE * 0.0274958766106), (-CHAMFER2_SIZE * 0.0274958766106, -CHAMFER2_SIZE * 0.999621916911), (0, 0), align=None)
    chamfer2_piece_9 = extrude(amount=63.143365976, mode=Mode.PRIVATE)
    chamfer2_piece_9 = split(chamfer2_piece_9, bisect_by=Plane(origin=(12.271567171, 2.333333333, 28.194006166), z_dir=(0, 0, -1)), keep=Keep.TOP, mode=Mode.PRIVATE)
    chamfer2_piece_9 = split(chamfer2_piece_9, bisect_by=Plane(origin=(12.271567171, 2.333333333, -34.405993834), z_dir=(0, 0, 1)), keep=Keep.TOP, mode=Mode.PRIVATE)
    add(chamfer2_piece_9)

    # Fillet9
    fillet9_edges = [part.edges().sort_by_distance(p)[0] for p in [
        (-54.861766162, 7.4, 28.194006166),
        (-47.777982648, 8.9, 28.194006166),
        (-39.527982648, 7.5, 28.194006166),
        (-31.277982648, 8.9, 28.194006166),
        (-18.061766162, 7.3, 28.194006166),
        (-74.861766162, 5.5, -9.732922372),
        (-74.861766162, 3.5, -2.982922372),
        (-74.861766162, 5.5, 3.767077628),
        (-58.967783765, 4.5, 28.194006166),
        (-65.404021091, 4.5, 28.942840829),
    ]]
    fillet(fillet9_edges, radius=FILLET9_R)


solid = part.part
